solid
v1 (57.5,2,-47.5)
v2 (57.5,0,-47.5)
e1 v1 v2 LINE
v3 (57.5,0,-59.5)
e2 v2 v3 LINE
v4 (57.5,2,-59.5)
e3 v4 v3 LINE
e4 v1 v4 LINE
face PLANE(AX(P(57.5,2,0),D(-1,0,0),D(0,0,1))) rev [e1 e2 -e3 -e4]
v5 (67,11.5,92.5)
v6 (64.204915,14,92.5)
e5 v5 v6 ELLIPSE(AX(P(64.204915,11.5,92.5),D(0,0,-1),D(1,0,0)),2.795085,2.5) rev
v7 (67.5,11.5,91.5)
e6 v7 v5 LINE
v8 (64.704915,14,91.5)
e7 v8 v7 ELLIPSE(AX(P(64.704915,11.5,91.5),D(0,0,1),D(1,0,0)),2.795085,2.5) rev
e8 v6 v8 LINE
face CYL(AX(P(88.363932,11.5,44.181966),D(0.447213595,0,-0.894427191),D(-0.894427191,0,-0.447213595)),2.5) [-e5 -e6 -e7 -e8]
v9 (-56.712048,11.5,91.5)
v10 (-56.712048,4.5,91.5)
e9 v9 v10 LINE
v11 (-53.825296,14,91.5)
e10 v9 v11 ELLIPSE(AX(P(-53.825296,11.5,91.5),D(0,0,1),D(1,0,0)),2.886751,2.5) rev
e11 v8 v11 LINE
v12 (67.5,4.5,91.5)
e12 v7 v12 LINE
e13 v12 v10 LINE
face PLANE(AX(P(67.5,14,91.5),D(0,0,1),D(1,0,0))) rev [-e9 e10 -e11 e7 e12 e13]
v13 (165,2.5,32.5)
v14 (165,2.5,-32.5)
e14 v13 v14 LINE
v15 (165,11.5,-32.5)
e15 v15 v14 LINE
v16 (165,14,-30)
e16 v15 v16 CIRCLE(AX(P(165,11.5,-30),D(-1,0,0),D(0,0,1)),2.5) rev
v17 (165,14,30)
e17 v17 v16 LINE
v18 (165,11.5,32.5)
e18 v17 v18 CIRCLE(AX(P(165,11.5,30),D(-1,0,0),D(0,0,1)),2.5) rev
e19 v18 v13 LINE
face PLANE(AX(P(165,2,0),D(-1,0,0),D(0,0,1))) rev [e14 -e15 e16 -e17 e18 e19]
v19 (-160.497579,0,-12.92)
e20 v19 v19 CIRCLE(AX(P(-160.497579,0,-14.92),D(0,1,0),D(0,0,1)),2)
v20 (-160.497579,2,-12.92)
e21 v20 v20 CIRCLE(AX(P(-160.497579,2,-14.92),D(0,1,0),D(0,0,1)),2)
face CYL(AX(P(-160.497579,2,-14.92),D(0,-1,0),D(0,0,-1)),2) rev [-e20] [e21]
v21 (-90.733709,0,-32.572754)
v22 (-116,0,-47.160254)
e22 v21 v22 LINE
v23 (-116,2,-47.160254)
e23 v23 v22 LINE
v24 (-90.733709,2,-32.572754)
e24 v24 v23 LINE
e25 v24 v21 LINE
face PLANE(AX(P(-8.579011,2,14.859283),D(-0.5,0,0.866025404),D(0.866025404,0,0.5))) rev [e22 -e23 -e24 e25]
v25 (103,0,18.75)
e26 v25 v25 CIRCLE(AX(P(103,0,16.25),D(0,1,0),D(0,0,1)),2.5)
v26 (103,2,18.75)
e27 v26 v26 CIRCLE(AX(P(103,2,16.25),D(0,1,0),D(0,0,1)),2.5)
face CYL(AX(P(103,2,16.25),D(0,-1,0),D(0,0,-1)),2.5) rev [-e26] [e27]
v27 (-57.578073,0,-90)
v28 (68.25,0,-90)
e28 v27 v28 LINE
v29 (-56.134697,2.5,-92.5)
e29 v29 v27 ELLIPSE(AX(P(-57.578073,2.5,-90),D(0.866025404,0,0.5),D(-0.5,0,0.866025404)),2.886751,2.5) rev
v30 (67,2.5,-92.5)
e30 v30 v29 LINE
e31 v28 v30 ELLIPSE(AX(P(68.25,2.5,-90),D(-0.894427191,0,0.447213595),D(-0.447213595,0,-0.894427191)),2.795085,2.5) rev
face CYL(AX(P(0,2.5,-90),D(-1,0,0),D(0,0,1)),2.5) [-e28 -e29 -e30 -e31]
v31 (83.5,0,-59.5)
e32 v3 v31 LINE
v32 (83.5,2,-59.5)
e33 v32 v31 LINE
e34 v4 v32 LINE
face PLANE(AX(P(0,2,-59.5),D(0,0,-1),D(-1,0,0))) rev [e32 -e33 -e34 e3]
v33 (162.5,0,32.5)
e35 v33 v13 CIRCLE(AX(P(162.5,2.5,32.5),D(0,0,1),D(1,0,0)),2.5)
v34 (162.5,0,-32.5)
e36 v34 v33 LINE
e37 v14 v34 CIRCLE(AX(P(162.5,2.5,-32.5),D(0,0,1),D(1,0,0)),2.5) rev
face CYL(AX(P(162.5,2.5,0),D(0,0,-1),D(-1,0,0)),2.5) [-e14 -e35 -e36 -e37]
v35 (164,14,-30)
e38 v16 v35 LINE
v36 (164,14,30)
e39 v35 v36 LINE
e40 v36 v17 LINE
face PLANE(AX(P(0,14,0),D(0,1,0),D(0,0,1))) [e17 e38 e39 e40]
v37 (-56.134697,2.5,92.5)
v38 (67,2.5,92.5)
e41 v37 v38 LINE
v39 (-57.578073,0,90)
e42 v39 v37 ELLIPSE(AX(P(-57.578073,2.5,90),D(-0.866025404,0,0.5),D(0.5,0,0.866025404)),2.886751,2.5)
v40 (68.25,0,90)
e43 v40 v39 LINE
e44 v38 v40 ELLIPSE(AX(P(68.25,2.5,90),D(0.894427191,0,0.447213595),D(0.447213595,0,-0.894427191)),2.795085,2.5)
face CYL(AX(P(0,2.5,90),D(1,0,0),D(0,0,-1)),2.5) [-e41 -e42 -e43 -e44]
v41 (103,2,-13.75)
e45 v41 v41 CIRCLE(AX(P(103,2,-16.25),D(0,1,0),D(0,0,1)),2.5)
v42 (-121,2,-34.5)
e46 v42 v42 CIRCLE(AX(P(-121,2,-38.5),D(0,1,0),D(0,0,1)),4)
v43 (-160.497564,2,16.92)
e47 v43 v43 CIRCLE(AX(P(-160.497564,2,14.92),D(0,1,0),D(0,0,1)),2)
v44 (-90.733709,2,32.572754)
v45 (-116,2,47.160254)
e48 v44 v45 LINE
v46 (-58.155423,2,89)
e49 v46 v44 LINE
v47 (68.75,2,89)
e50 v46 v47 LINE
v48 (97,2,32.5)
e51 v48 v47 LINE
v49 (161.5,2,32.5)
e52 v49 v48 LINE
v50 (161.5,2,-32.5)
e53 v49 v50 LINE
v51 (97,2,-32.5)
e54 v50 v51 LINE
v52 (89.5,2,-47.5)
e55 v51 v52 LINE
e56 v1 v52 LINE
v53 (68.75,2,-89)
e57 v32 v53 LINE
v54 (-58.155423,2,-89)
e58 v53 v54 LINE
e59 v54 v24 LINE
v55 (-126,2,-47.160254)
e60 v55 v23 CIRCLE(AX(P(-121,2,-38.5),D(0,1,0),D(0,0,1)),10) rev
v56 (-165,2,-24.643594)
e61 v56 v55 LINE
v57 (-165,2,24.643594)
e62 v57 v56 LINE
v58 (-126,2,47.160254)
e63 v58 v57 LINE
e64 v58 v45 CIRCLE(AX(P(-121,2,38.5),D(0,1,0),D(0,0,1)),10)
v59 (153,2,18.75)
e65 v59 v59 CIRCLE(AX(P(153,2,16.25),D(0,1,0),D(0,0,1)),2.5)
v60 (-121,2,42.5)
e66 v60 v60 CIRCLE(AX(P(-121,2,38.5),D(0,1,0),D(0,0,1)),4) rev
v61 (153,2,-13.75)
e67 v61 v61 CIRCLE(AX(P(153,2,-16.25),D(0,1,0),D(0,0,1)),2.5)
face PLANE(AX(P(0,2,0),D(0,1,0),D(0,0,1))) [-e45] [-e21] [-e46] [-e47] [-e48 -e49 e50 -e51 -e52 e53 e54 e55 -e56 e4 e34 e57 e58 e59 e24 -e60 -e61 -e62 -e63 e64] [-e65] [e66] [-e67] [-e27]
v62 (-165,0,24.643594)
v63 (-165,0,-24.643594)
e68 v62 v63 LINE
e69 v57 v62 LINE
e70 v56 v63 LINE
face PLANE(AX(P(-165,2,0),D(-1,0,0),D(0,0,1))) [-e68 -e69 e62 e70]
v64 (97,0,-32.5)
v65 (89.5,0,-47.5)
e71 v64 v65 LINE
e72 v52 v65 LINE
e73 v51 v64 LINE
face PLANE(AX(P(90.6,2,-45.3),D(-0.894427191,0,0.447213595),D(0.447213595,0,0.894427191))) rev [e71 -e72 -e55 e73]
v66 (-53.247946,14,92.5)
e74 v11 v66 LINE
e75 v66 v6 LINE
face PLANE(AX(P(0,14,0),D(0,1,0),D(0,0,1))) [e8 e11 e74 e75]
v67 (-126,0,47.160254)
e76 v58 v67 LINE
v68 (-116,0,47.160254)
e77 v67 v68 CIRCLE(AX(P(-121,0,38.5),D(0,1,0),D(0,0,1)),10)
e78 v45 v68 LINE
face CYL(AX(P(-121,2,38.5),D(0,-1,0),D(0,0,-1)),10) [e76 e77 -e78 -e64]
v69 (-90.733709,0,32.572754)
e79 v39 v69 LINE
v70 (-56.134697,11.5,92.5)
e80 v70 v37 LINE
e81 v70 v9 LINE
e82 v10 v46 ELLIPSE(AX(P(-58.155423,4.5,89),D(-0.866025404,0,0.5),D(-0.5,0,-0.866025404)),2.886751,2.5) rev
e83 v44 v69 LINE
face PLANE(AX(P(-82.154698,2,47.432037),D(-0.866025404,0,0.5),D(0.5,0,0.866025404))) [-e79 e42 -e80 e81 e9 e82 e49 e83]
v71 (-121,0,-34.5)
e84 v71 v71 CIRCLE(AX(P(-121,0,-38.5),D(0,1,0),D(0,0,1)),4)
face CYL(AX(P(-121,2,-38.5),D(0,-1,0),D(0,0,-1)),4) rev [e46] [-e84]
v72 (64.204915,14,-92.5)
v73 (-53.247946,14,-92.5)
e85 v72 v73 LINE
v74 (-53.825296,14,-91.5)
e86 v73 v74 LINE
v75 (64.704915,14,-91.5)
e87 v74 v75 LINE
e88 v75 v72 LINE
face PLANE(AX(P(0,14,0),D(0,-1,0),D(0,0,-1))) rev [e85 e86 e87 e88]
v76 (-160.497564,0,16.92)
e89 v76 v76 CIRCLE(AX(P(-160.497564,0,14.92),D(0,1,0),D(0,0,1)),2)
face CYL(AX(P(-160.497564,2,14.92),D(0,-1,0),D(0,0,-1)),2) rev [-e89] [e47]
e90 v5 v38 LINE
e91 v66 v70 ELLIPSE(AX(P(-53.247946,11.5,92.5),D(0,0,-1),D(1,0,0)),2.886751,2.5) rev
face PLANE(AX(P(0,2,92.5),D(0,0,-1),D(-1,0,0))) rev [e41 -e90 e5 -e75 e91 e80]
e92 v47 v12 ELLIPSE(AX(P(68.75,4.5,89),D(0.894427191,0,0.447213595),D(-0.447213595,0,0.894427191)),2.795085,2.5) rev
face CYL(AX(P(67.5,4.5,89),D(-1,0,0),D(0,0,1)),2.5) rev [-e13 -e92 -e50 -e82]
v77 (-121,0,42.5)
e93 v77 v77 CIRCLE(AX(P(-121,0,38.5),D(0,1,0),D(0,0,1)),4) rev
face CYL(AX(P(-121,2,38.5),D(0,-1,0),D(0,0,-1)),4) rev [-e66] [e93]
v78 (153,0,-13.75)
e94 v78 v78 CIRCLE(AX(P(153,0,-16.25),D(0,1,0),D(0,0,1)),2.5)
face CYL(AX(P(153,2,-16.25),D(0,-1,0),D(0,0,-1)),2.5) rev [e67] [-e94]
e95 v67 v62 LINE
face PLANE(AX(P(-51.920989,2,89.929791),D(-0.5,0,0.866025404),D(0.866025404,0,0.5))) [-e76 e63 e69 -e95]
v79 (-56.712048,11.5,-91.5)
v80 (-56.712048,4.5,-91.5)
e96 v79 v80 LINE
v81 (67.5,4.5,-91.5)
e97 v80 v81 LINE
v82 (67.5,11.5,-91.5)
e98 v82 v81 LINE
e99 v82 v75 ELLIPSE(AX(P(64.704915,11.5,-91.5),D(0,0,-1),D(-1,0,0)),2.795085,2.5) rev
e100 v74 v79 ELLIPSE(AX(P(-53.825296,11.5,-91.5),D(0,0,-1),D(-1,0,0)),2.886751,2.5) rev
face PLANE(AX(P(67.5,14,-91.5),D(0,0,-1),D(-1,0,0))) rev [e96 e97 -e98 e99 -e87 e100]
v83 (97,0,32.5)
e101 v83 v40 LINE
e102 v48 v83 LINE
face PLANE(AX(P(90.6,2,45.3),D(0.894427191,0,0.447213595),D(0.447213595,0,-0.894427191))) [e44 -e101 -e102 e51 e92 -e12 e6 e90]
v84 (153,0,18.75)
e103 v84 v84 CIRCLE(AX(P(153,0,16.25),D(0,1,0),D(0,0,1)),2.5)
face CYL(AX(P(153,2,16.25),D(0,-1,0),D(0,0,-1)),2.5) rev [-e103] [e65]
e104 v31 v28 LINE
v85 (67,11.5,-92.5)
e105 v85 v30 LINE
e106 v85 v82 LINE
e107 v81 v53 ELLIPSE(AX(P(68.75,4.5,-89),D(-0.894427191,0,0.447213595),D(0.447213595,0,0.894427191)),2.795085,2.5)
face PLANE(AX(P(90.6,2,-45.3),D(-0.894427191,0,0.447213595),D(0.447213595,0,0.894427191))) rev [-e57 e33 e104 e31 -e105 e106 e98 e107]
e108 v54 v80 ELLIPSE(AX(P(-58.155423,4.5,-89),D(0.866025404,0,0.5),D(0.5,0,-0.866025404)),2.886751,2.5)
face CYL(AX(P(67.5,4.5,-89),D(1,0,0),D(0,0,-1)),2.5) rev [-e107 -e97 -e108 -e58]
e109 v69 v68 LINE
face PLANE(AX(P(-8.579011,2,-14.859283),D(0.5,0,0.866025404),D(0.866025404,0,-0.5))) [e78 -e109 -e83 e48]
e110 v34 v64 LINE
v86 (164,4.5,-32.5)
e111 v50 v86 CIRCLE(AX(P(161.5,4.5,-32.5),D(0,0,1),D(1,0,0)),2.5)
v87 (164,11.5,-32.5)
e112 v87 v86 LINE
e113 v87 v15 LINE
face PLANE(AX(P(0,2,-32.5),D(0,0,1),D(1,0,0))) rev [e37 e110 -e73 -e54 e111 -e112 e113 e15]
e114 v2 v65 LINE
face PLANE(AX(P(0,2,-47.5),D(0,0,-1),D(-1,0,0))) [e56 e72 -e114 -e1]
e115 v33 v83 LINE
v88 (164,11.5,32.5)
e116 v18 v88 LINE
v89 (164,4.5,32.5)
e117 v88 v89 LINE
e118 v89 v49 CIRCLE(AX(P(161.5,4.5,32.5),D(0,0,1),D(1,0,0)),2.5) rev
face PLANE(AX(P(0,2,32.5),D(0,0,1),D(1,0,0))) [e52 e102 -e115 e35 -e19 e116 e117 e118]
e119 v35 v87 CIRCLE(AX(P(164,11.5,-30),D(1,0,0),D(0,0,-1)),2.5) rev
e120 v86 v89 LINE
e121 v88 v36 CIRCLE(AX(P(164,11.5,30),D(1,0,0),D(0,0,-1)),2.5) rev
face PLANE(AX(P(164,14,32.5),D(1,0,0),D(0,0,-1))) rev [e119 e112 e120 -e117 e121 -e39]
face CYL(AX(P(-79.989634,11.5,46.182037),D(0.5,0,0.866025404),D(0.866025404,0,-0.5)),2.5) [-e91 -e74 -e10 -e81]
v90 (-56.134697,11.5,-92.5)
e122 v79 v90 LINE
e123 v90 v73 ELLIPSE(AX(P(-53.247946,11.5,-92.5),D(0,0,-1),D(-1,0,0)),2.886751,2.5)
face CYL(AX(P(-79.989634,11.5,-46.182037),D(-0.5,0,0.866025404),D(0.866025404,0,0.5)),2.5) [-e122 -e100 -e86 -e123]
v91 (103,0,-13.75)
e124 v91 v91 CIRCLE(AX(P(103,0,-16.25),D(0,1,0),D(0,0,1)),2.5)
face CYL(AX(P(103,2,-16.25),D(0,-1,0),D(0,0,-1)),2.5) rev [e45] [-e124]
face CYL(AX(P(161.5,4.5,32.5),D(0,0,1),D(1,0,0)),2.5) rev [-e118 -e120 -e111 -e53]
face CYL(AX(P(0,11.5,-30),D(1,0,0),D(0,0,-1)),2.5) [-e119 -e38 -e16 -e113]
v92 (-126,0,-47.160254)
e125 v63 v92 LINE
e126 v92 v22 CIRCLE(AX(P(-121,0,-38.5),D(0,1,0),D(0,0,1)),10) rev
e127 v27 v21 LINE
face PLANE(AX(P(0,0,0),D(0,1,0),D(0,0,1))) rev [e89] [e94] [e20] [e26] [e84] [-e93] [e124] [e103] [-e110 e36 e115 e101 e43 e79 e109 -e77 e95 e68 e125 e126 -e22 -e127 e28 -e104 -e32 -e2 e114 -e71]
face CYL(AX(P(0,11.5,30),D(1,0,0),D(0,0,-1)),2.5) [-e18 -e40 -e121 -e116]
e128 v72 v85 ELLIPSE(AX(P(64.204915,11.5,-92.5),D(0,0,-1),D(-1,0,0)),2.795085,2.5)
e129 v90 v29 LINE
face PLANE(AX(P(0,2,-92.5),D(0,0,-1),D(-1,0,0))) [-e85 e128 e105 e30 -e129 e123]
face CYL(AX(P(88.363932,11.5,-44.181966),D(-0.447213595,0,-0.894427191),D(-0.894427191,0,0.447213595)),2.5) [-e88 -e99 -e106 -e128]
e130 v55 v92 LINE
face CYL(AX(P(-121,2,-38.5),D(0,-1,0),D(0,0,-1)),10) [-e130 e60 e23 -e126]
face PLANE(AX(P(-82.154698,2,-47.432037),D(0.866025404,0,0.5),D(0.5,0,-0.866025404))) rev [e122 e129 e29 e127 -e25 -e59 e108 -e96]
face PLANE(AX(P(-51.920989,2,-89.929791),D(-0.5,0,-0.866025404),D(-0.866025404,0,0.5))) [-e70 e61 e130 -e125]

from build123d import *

# Parameters (mm, degrees)
SKETCH1_R           = 4
SKETCH1_R_2         = 2
SKETCH1_R_3         = 2.5
BOSS_EXTRUDE1_DEPTH = 2
SKETCH2_W           = 1
SKETCH2_H           = 65
BOSS_EXTRUDE2_DEPTH = 12
FILLET1_R           = 2.5


with BuildPart() as part:
    # Sketch1 → Boss-Extrude1 (new body)
    with BuildSketch(Plane(origin=(0, 0, 0), x_dir=(1, 0, 0), z_dir=(0, 1, 0))):
        with BuildLine():
            Line((165, -32.5), (165, 32.5))
            Line((165, 32.5), (97, 32.5))
            Line((97, 32.5), (89.5, 47.5))
            Line((89.5, 47.5), (57.5, 47.5))
            Line((57.5, 47.5), (57.5, 59.5))
            Line((57.5, 59.5), (83.5, 59.5))
            Line((83.5, 59.5), (67, 92.5))
            Line((67, 92.5), (-56.134697257, 92.5))
            Line((-56.134697257, 92.5), (-90.733708845, 32.572754038))
            Line((-90.733708845, 32.572754038), (-116, 47.160254038))
            ThreePointArc((-116, 47.160254038), (-121, 48.5), (-126, 47.160254038))
            Line((-126, 47.160254038), (-165, 24.643593539))
            Line((-165, 24.643593539), (-165, -24.643593539))
            Line((-165, -24.643593539), (-126, -47.160254038))
            ThreePointArc((-126, -47.160254038), (-121, -48.5), (-116, -47.160254038))
            Line((-116, -47.160254038), (-90.733708845, -32.572754038))
            Line((-90.733708845, -32.572754038), (-56.134697257, -92.5))
            Line((-56.134697257, -92.5), (67, -92.5))
            Line((67, -92.5), (97, -32.5))
            Line((97, -32.5), (165, -32.5))
        make_face()
        with Locations(Location((-121, -38.5, 0), (0, 0, 270))):
            Circle(SKETCH1_R, mode=Mode.SUBTRACT)
        with Locations(Location((-160.497563939, -14.92, 0), (0, 0, 270))):
            Circle(SKETCH1_R_2, mode=Mode.SUBTRACT)
        with Locations(Location((103, -16.25, 0), (0, 0, 270))):
            Circle(SKETCH1_R_3, mode=Mode.SUBTRACT)
        with Locations(Location((153, -16.25, 0), (0, 0, 270))):
            Circle(SKETCH1_R_3, mode=Mode.SUBTRACT)
        with Locations(Location((-160.497578586, 14.92, 0), (0, 0, 270))):
            Circle(SKETCH1_R_2, mode=Mode.SUBTRACT)
        with Locations(Location((-121, 38.5, 0), (0, 0, 270))):
            Circle(SKETCH1_R, mode=Mode.SUBTRACT)
        with Locations(Location((103, 16.25, 0), (0, 0, 270))):
            Circle(SKETCH1_R_3, mode=Mode.SUBTRACT)
        with Locations(Location((153, 16.25, 0), (0, 0, 270))):
            Circle(SKETCH1_R_3, mode=Mode.SUBTRACT)
    extrude(amount=BOSS_EXTRUDE1_DEPTH)

    # Sketch2 → Boss-Extrude2 (add)
    with BuildSketch(Plane(origin=(0, 2, 0), x_dir=(1, 0, 0), z_dir=(0, 1, 0))):
        Polygon((-56.134697257, -92.5), (67, -92.5), (67.5, -91.5), (-56.712047526, -91.5), align=None)
        Polygon((-56.134697257, 92.5), (67, 92.5), (67.5, 91.5), (-56.712047526, 91.5), align=None)
        with Locations((164.5, 0)):
            Rectangle(SKETCH2_W, SKETCH2_H)
    extrude(amount=BOSS_EXTRUDE2_DEPTH)

    # Fillet1
    # the kernel refuses this fillet: 2.5 mm, written as the material it adds along each edge
    with BuildSketch(Plane(origin=(73.75, 2, -91.5), x_dir=(0, 1, 0), z_dir=(-1, 0, 0))) as fillet1_piece_1_section:
        with BuildLine():
            CenterArc((FILLET1_R, -FILLET1_R), FILLET1_R, 90, 90)
            Line((0, -FILLET1_R), (0, 0))
            Line((0, 0), (FILLET1_R, 0))
        make_face()
    fillet1_piece_1 = extrude(amount=136.712047526, mode=Mode.PRIVATE)
    fillet1_piece_1 = split(fillet1_piece_1, bisect_by=Plane(origin=(-41.43720377, 2.56450665, -117.956805463), z_dir=(0.8660254037844399, 0, 0.49999999999999795)), keep=Keep.TOP, mode=Mode.PRIVATE)
    fillet1_piece_1 = split(fillet1_piece_1, bisect_by=Plane(origin=(55.3017959, 2.56450665, -115.8964082), z_dir=(-0.894427190999916, 0, 0.447213595499958)), keep=Keep.TOP, mode=Mode.PRIVATE)
    add(fillet1_piece_1)
    with BuildSketch(Plane(origin=(164, 2, 32.5), x_dir=(0, 1, 0), z_dir=(0, 0, -1))) as fillet1_piece_2:
        with BuildLine():
            CenterArc((FILLET1_R, -FILLET1_R), FILLET1_R, 90, 90)
            Line((0, -FILLET1_R), (0, 0))
            Line((0, 0), (FILLET1_R, 0))
        make_face()
    extrude(amount=65)
    with BuildSketch(Plane(origin=(73.75, 2, 91.5), x_dir=(0, 0, -1), z_dir=(-1, 0, 0))) as fillet1_piece_3_section:
        with BuildLine():
            CenterArc((FILLET1_R, -FILLET1_R), FILLET1_R, 90, 90)
            Line((0, -FILLET1_R), (0, 0))
            Line((0, 0), (FILLET1_R, 0))
        make_face()
    fillet1_piece_3 = extrude(amount=136.712047526, mode=Mode.PRIVATE)
    fillet1_piece_3 = split(fillet1_piece_3, bisect_by=Plane(origin=(55.3017959, 2.56450665, 115.8964082), z_dir=(-0.894427190999916, 0, -0.44721359549995787)), keep=Keep.TOP, mode=Mode.PRIVATE)
    fillet1_piece_3 = split(fillet1_piece_3, bisect_by=Plane(origin=(-41.43720377, 2.56450665, 117.956805463), z_dir=(0.8660254037844399, 0, -0.49999999999999795)), keep=Keep.TOP, mode=Mode.PRIVATE)
    add(fillet1_piece_3)
    # the kernel refuses this fillet: 2.5 mm, written as the material it takes off along each edge
    with BuildSketch(Plane(origin=(-59.837047526, 14, -86.087341226), x_dir=(0, -1, 0), z_dir=(0.5000000000000019, 0, -0.8660254037844376)), Plane(origin=(-59.837047526, 14, 86.087341226), x_dir=(0.8660254037844394, 0, -0.49999999999999867), z_dir=(0.4999999999999987, 0, 0.8660254037844395))) as fillet1_2_piece_1:
        with BuildLine():
            CenterArc((FILLET1_R, -FILLET1_R), FILLET1_R, 90, 90)
            Line((0, -FILLET1_R), (0, 0))
            Line((0, 0), (FILLET1_R, 0))
        make_face()
    extrude(amount=13.654700538, mode=Mode.SUBTRACT)
    with BuildSketch(Plane(origin=(64.204915028, 14, -98.090169944), x_dir=(0, -1, 0), z_dir=(0.447213595499958, 0, 0.894427190999916))) as fillet1_2_piece_2:
        with BuildLine():
            CenterArc((FILLET1_R, -FILLET1_R), FILLET1_R, 90, 90)
            Line((0, -FILLET1_R), (0, 0))
            Line((0, 0), (FILLET1_R, 0))
        make_face()
    extrude(amount=13.618033989, mode=Mode.SUBTRACT)
    with BuildSketch(Plane(origin=(157.75, 14, -32.5), x_dir=(0, -1, 0), z_dir=(1, 0, 0)), Plane(origin=(171.25, 14, 32.5), x_dir=(0, -1, 0), z_dir=(-1, 0, 0))) as fillet1_2_piece_3:
        with BuildLine():
            CenterArc((FILLET1_R, -FILLET1_R), FILLET1_R, 90, 90)
            Line((0, -FILLET1_R), (0, 0))
            Line((0, 0), (FILLET1_R, 0))
        make_face()
    extrude(amount=13.5, mode=Mode.SUBTRACT)
    with BuildSketch(Plane(origin=(73.25, 0, -92.5), x_dir=(0, 0, 1), z_dir=(-1, 0, 0))) as fillet1_2_piece_4:
        with BuildLine():
            CenterArc((FILLET1_R, FILLET1_R), FILLET1_R, 180, 90)
            Line((0, FILLET1_R), (0, 0))
            Line((0, 0), (FILLET1_R, 0))
        make_face()
    extrude(amount=135.634697257, mode=Mode.SUBTRACT)
    with BuildSketch(Plane(origin=(165, 0, 38.75), x_dir=(-1, 0, 0), z_dir=(0, 0, -1))) as fillet1_2_piece_5:
        with BuildLine():
            CenterArc((FILLET1_R, FILLET1_R), FILLET1_R, 180, 90)
            Line((0, FILLET1_R), (0, 0))
            Line((0, 0), (FILLET1_R, 0))
        make_face()
    extrude(amount=77.5, mode=Mode.SUBTRACT)
    with BuildSketch(Plane(origin=(-62.384697257, 0, 92.5), x_dir=(0, 1, 0), z_dir=(1, 0, 0))) as fillet1_2_piece_6:
        with BuildLine():
            CenterArc((FILLET1_R, -FILLET1_R), FILLET1_R, 90, 90)
            Line((0, -FILLET1_R), (0, 0))
            Line((0, 0), (FILLET1_R, 0))
        make_face()
    extrude(amount=135.634697257, mode=Mode.SUBTRACT)
    with BuildSketch(Plane(origin=(64.204915028, 14, 98.090169944), x_dir=(0, -1, 0), z_dir=(0.447213595499958, 0, -0.894427190999916))) as fillet1_2_piece_7:
        with BuildLine():
            CenterArc((FILLET1_R, FILLET1_R), FILLET1_R, 180, 90)
            Line((0, FILLET1_R), (0, 0))
            Line((0, 0), (FILLET1_R, 0))
        make_face()
    extrude(amount=13.618033989, mode=Mode.SUBTRACT)


solid = part.part
